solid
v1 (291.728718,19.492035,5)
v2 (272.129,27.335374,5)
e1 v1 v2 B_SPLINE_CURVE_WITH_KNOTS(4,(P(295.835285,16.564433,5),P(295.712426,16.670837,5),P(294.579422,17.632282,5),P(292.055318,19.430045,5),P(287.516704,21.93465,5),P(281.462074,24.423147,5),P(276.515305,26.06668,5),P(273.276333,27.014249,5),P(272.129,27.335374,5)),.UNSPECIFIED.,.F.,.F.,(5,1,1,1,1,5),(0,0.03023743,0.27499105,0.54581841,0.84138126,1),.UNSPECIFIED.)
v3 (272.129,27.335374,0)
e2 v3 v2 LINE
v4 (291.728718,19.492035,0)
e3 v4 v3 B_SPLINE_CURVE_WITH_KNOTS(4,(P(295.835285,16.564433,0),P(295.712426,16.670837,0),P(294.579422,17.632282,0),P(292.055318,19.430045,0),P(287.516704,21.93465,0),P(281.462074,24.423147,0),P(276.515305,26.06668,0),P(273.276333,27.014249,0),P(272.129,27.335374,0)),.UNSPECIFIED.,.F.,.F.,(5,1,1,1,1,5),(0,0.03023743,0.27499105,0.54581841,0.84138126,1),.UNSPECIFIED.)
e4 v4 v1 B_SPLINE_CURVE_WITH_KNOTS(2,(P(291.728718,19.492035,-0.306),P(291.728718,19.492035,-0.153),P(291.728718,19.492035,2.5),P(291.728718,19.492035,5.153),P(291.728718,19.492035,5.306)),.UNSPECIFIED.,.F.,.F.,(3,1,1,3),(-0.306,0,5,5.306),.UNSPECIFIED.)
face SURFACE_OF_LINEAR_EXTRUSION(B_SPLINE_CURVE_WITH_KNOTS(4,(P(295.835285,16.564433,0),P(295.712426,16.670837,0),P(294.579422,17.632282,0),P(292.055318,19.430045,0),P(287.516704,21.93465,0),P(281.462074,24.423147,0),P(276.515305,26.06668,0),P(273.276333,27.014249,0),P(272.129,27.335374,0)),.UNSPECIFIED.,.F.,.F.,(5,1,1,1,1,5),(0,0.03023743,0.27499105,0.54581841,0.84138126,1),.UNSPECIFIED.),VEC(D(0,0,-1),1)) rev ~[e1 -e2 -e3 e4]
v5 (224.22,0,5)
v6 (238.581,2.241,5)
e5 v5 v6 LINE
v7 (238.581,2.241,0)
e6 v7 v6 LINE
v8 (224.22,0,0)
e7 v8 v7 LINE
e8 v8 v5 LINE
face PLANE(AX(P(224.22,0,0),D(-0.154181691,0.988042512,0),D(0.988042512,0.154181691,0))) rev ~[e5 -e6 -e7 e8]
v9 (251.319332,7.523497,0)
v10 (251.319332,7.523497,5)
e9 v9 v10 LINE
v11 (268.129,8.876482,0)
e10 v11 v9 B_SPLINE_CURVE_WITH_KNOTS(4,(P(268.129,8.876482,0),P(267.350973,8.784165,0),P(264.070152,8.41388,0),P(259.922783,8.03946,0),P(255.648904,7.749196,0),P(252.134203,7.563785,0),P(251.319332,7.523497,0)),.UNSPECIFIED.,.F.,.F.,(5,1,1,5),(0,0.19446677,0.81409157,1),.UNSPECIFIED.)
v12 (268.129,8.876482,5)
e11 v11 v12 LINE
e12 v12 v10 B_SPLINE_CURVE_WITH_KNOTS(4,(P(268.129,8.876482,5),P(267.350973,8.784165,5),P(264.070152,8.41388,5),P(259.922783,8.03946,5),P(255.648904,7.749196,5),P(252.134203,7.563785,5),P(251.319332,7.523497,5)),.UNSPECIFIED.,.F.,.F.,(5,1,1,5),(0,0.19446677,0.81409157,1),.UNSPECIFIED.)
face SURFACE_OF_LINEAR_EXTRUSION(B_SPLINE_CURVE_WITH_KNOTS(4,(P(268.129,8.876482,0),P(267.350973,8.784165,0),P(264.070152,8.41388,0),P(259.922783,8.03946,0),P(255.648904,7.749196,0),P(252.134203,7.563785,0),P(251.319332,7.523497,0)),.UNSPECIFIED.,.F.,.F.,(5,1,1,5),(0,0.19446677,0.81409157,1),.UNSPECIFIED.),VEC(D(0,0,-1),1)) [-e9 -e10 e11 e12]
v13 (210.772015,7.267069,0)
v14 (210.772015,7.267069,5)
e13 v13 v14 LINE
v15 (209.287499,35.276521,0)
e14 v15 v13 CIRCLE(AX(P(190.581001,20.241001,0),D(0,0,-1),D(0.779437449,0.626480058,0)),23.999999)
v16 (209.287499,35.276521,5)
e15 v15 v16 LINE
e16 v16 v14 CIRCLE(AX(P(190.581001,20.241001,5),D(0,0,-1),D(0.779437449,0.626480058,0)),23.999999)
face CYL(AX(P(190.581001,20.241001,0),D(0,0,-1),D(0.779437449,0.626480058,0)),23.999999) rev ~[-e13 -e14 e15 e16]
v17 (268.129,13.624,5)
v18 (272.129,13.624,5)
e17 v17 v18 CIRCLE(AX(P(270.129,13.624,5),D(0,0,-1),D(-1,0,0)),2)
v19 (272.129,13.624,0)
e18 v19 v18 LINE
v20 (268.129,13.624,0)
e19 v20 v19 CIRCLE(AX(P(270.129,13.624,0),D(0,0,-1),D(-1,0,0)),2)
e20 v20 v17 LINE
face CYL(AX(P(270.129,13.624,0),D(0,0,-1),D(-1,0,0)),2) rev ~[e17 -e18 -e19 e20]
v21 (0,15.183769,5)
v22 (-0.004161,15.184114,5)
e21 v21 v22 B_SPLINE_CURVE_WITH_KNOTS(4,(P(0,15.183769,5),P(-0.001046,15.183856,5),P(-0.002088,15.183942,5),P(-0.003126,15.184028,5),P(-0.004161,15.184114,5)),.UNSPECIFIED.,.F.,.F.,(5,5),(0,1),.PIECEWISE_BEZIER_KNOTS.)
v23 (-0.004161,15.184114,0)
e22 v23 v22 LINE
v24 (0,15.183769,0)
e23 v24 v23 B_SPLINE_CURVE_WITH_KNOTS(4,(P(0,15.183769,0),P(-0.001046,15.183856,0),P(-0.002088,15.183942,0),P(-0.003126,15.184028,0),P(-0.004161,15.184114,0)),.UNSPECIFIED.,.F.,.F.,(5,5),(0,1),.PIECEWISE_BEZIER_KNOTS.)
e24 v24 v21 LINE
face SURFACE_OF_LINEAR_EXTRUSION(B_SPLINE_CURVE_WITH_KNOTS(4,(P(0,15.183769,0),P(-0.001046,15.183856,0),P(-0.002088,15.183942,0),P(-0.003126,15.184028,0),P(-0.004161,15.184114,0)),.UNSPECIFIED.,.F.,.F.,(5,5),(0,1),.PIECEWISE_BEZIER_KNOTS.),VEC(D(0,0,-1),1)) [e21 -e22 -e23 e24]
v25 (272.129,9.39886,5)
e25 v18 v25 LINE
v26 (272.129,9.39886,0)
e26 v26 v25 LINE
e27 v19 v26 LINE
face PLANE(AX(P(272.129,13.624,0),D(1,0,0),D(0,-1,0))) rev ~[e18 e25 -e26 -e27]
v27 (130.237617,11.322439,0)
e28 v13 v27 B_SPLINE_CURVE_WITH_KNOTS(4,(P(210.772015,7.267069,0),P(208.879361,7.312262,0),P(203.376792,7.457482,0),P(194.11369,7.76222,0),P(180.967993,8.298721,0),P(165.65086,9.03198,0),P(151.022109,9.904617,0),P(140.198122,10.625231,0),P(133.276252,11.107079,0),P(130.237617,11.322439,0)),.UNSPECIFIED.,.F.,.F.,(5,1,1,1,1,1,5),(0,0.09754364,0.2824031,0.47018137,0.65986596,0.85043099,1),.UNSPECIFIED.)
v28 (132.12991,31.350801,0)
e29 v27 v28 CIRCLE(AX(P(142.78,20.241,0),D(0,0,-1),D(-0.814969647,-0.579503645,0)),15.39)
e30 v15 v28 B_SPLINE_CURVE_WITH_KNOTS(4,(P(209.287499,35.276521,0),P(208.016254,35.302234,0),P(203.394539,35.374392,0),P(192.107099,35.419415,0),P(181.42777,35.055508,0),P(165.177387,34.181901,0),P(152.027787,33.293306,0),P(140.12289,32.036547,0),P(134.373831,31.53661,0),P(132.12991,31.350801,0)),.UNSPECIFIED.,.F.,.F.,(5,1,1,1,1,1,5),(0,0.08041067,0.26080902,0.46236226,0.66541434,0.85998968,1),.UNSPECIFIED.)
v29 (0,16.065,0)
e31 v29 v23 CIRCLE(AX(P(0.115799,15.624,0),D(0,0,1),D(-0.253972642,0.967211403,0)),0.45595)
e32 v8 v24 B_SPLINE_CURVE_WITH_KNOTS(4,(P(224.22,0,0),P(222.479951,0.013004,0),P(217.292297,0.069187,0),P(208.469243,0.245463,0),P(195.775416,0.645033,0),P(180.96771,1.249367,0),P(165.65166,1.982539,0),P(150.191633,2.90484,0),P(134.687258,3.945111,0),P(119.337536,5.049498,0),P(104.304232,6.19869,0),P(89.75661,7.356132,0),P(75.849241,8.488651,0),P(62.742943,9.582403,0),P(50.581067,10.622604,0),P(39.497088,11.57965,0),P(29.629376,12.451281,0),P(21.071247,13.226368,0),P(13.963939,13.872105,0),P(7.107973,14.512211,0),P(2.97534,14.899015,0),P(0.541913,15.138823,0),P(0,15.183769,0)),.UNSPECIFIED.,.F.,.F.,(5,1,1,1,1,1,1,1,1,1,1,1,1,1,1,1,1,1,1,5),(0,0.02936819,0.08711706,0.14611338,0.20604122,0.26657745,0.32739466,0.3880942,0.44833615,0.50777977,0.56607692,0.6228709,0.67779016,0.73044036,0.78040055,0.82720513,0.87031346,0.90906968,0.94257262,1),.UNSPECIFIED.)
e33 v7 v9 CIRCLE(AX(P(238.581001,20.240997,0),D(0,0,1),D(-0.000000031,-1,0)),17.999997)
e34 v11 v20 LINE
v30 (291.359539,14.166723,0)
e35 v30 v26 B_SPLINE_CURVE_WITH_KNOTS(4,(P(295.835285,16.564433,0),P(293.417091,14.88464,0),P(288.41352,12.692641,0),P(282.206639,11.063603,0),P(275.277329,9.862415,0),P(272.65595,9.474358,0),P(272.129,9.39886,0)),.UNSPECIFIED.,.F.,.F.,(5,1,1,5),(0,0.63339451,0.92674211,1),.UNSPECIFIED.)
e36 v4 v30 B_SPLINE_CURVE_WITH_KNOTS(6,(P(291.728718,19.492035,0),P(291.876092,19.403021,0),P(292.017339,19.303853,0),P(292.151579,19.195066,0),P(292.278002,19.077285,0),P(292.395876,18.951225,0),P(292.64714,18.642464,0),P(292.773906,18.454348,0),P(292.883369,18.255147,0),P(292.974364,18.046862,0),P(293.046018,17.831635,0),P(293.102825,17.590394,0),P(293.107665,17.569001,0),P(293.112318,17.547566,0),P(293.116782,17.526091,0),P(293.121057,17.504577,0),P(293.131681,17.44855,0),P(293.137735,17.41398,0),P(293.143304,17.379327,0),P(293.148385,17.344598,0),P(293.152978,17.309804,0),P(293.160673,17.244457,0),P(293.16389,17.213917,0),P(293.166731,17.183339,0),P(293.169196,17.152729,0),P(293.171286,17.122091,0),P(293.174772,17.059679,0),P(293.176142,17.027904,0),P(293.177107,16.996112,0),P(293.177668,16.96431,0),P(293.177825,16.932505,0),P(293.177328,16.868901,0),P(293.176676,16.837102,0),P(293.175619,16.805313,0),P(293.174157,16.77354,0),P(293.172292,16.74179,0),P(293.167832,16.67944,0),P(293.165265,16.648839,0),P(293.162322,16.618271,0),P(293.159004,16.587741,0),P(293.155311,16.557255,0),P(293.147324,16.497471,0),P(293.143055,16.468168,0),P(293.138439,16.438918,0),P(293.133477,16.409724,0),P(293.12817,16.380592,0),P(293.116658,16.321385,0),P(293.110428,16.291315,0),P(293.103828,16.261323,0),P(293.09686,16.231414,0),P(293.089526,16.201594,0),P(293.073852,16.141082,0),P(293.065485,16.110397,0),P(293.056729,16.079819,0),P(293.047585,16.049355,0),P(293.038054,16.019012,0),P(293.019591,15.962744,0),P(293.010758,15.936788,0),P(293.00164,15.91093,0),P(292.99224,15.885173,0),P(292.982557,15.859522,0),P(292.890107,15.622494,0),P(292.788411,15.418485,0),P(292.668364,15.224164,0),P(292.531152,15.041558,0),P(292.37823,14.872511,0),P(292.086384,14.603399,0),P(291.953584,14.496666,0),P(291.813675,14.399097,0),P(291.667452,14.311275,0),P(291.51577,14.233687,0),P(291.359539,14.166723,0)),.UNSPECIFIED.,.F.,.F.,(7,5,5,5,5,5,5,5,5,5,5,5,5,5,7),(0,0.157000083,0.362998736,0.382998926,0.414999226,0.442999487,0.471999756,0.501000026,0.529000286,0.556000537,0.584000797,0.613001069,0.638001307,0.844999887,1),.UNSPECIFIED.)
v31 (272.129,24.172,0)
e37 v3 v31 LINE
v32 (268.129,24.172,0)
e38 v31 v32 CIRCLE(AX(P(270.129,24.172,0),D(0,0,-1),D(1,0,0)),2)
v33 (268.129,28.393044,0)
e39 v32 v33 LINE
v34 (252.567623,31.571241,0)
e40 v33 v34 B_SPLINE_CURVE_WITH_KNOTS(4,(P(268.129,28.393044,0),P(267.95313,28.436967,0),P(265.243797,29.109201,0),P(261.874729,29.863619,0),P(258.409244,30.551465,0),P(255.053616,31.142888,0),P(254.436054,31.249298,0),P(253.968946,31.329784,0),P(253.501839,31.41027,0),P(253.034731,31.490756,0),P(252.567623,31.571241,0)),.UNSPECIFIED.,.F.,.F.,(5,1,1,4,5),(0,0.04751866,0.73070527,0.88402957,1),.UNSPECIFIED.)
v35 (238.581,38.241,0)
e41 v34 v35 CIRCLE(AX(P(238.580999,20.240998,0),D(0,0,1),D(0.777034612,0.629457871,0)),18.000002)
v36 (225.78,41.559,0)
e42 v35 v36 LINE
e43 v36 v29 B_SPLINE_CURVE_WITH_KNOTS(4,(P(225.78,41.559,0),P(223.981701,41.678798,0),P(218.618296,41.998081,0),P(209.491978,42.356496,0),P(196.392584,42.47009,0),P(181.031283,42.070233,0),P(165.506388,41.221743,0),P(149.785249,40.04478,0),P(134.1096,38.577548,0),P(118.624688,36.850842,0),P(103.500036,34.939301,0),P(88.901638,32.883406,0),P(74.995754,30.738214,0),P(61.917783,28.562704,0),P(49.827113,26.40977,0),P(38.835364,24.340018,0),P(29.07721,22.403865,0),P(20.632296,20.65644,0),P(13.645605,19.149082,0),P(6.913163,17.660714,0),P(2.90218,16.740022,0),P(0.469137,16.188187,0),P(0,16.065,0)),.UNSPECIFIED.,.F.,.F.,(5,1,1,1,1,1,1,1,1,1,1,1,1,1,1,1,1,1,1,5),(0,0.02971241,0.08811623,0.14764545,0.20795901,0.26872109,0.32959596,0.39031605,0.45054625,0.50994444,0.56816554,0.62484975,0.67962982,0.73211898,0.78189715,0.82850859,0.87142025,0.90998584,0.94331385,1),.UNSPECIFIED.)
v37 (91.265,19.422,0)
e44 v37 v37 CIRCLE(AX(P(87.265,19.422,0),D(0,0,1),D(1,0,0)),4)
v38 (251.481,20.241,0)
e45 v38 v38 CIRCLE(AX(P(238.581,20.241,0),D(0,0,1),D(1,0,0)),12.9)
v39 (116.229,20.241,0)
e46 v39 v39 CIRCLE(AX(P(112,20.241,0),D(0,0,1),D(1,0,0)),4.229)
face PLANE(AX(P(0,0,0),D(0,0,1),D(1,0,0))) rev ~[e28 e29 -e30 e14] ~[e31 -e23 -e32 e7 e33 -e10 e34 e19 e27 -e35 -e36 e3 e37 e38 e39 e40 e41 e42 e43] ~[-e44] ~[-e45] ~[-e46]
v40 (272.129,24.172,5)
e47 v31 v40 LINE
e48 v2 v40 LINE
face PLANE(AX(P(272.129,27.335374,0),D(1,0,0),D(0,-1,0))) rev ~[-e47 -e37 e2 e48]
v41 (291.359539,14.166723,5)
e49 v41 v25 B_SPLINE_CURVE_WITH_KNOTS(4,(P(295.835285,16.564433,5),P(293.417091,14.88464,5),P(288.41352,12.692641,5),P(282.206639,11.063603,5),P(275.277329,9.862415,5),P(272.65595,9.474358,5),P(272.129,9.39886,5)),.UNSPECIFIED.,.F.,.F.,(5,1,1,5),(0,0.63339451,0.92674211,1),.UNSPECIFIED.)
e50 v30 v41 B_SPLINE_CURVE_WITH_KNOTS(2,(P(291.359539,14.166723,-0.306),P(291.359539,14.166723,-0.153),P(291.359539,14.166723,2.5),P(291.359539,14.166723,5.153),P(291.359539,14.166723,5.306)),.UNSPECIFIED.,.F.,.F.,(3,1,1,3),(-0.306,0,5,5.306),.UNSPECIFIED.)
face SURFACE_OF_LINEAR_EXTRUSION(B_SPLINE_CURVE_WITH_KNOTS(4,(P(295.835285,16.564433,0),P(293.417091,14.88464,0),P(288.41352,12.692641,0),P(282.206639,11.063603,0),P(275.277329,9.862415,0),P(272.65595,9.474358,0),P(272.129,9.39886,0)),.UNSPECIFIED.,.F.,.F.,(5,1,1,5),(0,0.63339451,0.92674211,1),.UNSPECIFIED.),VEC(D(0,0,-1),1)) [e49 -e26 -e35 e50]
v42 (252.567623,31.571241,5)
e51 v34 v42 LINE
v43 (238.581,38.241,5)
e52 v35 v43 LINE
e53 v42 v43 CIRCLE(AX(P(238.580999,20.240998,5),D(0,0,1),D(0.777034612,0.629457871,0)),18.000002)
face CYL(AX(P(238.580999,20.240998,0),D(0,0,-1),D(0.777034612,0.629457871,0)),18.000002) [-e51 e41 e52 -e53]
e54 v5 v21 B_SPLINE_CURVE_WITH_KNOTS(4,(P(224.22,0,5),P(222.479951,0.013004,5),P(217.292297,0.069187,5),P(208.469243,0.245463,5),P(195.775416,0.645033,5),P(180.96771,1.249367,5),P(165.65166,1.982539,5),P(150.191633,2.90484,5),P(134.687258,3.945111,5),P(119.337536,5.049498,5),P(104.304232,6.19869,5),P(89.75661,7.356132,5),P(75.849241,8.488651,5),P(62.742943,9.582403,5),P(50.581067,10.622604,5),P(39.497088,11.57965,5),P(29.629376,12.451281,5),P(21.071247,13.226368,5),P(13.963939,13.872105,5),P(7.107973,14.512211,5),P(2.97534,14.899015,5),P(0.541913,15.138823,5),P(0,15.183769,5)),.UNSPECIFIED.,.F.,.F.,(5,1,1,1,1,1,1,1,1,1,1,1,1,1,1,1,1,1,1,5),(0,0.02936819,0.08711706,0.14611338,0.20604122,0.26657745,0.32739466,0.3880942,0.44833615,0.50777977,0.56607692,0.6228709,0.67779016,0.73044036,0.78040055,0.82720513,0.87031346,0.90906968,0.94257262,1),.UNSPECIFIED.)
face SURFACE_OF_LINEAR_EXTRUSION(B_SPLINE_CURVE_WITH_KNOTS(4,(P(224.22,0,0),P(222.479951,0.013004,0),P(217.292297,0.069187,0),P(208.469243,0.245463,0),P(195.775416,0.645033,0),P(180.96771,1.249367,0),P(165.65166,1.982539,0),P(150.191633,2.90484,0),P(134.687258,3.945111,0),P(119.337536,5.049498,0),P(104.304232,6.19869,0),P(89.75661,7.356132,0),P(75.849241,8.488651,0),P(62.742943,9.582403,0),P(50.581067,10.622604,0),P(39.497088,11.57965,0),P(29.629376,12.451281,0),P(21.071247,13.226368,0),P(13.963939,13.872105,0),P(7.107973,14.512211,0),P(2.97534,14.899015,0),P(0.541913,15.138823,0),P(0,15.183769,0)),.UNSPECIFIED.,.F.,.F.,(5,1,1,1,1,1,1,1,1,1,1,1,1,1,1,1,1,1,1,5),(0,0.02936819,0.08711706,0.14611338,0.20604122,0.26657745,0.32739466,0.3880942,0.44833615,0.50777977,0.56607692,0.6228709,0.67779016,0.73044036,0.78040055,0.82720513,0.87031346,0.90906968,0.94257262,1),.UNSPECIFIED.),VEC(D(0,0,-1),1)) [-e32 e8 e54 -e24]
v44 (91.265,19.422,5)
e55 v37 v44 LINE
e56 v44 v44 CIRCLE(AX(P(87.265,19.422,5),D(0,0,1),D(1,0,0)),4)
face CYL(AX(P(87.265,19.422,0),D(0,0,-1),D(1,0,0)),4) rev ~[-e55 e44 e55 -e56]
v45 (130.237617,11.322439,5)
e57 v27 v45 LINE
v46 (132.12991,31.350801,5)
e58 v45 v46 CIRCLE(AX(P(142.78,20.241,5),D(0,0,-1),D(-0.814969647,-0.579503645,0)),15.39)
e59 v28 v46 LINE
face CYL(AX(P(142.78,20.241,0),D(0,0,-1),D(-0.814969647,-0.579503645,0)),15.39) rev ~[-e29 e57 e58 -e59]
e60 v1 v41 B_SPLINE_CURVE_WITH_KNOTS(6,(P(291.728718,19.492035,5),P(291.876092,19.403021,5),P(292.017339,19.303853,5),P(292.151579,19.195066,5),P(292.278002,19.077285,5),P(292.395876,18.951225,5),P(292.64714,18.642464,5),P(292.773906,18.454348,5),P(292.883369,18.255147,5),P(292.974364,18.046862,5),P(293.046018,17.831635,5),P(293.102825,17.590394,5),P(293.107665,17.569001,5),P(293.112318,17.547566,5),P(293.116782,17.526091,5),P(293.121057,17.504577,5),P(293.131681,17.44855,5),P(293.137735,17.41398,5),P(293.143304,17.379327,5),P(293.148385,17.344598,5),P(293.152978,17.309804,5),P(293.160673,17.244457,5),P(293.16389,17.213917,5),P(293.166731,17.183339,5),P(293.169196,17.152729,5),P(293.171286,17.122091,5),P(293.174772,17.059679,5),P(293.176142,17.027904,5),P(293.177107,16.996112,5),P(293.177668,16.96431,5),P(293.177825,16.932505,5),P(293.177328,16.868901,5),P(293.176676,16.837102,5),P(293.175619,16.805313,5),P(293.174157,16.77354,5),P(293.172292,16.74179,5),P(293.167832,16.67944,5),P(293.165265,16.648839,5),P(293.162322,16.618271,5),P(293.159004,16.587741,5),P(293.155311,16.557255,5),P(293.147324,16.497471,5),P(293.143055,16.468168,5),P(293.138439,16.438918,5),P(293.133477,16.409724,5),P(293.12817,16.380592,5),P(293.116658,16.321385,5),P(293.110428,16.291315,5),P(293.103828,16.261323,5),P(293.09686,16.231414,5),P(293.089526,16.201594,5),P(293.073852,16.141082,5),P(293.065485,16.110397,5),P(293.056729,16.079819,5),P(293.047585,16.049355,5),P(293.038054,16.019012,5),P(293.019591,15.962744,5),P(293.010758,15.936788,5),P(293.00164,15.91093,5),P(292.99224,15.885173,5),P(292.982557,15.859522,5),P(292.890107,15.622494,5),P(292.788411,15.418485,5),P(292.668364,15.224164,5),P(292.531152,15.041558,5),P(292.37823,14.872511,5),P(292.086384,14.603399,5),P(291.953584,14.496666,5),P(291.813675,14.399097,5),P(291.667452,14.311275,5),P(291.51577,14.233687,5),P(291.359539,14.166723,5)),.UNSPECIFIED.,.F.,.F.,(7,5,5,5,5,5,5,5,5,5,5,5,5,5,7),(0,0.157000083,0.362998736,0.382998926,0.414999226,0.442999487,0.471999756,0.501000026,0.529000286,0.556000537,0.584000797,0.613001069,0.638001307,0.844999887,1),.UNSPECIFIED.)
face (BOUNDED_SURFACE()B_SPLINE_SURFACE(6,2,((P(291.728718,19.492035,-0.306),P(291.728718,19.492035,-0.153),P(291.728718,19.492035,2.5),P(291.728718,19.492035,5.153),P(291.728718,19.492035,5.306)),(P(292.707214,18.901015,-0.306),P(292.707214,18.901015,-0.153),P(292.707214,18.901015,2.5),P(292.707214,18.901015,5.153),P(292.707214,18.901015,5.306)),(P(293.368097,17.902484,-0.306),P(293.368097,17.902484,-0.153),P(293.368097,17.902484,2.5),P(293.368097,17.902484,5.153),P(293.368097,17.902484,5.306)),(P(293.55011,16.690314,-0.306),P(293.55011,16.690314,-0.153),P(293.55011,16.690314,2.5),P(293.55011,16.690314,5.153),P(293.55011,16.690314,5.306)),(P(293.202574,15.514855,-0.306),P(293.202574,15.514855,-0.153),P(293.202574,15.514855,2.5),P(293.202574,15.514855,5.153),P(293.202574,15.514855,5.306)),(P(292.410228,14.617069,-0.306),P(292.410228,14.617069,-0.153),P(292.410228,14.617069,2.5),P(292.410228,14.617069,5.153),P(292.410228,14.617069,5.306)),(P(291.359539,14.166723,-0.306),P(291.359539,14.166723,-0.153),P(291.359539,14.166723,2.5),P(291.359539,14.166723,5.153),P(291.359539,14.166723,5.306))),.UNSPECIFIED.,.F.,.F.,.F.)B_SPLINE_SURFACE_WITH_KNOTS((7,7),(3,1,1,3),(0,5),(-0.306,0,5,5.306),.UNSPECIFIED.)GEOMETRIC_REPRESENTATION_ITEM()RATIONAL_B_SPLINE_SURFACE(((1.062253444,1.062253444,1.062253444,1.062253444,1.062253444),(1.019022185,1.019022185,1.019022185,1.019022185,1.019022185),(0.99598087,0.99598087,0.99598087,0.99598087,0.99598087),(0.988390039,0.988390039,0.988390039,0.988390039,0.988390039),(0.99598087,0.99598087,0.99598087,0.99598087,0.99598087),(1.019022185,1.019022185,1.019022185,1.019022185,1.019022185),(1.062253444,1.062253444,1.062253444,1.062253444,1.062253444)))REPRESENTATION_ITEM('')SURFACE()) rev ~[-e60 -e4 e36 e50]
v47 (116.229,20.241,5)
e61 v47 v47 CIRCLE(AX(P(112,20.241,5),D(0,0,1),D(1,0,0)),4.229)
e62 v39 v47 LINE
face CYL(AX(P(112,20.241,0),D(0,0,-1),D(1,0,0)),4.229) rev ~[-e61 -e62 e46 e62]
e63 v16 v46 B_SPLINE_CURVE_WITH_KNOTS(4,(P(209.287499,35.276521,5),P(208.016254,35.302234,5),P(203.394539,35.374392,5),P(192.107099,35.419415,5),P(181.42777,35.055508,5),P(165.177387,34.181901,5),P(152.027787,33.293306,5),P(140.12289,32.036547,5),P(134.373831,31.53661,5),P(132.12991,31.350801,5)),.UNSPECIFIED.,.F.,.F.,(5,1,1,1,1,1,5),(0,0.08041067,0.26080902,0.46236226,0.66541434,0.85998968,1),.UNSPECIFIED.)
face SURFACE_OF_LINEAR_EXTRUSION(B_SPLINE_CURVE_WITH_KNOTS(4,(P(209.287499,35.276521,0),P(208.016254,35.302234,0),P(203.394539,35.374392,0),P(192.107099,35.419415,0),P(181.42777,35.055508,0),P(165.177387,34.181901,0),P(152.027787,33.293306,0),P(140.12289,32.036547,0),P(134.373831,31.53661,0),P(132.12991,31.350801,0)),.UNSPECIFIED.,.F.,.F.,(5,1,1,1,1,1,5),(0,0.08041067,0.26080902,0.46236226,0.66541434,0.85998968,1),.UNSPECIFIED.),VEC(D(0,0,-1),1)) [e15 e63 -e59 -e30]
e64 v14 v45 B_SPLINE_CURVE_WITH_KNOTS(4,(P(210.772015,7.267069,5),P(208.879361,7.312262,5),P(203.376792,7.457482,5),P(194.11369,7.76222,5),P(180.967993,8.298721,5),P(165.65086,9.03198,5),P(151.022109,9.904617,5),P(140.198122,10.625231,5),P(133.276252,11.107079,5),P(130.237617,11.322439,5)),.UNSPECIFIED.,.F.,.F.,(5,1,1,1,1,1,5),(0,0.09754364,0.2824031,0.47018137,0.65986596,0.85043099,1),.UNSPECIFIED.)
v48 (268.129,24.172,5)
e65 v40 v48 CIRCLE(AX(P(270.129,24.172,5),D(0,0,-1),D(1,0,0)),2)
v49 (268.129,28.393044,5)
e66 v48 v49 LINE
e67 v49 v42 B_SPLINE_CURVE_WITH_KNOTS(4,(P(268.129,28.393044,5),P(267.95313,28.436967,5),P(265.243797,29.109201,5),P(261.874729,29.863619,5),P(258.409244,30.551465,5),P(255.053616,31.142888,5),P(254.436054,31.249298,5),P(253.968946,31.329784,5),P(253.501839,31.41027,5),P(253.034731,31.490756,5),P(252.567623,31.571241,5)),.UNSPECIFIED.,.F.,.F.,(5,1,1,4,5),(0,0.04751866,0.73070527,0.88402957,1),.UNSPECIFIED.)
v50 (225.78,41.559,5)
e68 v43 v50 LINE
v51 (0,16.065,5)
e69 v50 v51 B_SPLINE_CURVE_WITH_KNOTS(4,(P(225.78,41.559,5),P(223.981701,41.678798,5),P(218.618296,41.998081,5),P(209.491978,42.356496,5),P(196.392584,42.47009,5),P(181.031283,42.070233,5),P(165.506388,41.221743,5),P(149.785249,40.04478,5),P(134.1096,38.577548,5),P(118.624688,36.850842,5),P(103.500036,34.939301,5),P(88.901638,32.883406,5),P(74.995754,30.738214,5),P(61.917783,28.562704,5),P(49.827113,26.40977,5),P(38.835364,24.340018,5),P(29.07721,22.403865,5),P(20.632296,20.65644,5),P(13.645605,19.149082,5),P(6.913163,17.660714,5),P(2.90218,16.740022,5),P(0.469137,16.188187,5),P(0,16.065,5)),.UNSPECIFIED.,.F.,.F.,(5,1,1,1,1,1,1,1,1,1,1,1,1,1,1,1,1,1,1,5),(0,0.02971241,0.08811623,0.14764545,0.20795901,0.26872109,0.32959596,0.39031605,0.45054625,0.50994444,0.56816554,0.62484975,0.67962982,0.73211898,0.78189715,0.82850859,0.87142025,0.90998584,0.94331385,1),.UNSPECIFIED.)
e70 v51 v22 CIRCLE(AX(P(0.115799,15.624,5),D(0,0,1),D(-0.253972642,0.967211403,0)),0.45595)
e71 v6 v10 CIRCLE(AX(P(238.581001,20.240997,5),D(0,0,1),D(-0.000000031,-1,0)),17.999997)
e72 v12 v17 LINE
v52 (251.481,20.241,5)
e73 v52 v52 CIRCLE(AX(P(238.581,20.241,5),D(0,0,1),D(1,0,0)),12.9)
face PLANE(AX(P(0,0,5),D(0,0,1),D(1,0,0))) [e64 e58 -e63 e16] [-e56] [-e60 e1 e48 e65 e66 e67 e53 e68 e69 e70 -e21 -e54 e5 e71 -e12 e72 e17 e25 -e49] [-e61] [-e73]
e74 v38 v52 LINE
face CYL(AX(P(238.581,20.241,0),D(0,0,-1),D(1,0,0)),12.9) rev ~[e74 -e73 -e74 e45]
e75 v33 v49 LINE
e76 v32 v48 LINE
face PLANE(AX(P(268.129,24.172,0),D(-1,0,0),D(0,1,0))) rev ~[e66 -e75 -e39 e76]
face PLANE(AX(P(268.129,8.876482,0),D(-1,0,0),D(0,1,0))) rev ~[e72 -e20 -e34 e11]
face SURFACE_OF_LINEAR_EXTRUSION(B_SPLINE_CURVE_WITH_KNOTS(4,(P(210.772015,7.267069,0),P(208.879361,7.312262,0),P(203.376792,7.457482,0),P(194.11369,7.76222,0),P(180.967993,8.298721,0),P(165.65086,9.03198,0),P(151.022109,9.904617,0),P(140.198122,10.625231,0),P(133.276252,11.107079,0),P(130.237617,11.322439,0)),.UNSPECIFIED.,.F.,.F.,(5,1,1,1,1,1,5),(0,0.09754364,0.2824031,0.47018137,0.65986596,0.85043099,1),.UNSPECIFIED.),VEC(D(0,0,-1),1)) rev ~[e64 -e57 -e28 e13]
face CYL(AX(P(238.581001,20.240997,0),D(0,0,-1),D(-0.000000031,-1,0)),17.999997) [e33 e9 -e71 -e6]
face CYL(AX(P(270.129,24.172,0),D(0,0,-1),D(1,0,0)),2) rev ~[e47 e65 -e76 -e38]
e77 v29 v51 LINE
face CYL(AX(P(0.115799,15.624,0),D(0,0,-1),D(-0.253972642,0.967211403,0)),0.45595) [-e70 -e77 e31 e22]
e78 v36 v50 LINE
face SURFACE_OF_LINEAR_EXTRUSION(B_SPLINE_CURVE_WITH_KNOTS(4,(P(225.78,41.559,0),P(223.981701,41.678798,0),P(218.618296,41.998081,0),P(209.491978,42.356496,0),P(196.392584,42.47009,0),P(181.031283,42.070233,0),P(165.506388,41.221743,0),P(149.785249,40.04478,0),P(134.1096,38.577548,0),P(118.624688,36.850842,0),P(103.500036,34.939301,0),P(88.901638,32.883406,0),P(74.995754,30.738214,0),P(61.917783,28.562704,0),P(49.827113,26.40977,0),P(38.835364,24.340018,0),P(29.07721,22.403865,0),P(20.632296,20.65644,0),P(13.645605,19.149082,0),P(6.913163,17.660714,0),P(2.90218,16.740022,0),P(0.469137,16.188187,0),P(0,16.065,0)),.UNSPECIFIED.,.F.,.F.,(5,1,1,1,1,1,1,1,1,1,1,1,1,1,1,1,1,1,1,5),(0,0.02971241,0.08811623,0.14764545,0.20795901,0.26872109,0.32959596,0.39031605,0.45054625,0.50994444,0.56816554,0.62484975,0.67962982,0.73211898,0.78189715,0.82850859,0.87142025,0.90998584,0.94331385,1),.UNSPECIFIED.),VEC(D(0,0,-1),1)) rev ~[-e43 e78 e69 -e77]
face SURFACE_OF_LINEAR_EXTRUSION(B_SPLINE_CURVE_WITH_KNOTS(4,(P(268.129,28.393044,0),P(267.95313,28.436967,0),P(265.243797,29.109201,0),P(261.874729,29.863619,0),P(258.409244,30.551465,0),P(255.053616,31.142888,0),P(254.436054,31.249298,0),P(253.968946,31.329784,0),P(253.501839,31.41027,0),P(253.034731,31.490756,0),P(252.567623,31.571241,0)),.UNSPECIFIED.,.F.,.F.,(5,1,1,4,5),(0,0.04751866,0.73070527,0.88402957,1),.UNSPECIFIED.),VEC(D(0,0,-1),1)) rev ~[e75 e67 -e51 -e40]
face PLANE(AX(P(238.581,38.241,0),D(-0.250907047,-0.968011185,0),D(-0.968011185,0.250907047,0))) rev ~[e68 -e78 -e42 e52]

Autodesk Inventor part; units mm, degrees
ref_plane "YZ Plane" through (0, 0, 0) normal (1, 0, 0) x (0, 1, 0)
ref_plane "XZ Plane" through (0, 0, 0) normal (0, 1, 0) x (-1, 0, 0)
ref_plane "XY Plane" through (0, 0, 0) normal (0, 0, 1) x (1, 0, 0)
sketch "Sketch1" plane through (0, 0, 0) normal (0, 0, 1) x (1, 0, 0)
  spline S0 degree 4 poles (254.436054, 38.258138) (252.159915, 38.650332) (246.788709, 39.499265) (237.984874, 40.618279) (225.357478, 41.704285) (211.202741, 42.341661) (196.392584, 42.47009) (181.031283, 42.070233) (165.506388, 41.221743) (149.785249, 40.04478) (134.1096, 38.577548) (118.624688, 36.850842) (103.500036, 34.939301) (88.901638, 32.883406) (74.995754, 30.738214) (61.917783, 28.562704) (49.827113, 26.40977) (38.835364, 24.340018) (29.07721, 22.403865) (20.632296, 20.65644) (13.645605, 19.149082) (6.913163, 17.660714) (2.90218, 16.740022) (0.469137, 16.188187) (0, 16.065) knots 0.21429705 0.21429705 0.21429705 0.21429705 0.21429705 0.2433201 0.28177524 0.32154178 0.36237973 0.40400459 0.44617789 0.48866482 0.5312306 0.57368816 0.61580317 0.65733642 0.6980466 0.73768213 0.77598623 0.81268845 0.84749504 0.88008735 0.91009265 0.93705903 0.9603631 1 1 1 1 1
  spline S1 degree 4 poles (299.999998, 15.624) (299.805651, 13.312974) (297.70854, 10.343184) (293.050897, 7.5008) (285.395888, 4.883043) (278.112378, 3.216454) (269.51472, 1.892454) (259.681019, 0.912997) (248.712883, 0.278332) (236.711867, -0.030891) (223.806667, -0.050368) (210.125319, 0.193333) (195.775416, 0.645033) (180.96771, 1.249367) (165.65166, 1.982539) (150.191633, 2.90484) (134.687258, 3.945111) (119.337536, 5.049498) (104.304232, 6.19869) (89.75661, 7.356132) (75.849241, 8.488651) (62.742943, 9.582403) (50.581067, 10.622604) (39.497088, 11.57965) (29.629376, 12.451281) (21.071247, 13.226368) (13.963939, 13.872105) (7.103576, 14.512622) (2.968279, 14.899676) (0.533018, 15.1397) (-0.004161, 15.184114) knots 0 0 0 0 0 0.05437224 0.07982113 0.10791215 0.1384988 0.1713415 0.2061871 0.24278378 0.28089063 0.3202767 0.36071301 0.4020228 0.44398485 0.4863729 0.52895769 0.5714601 0.61364209 0.65526508 0.6960853 0.73585299 0.77430798 0.81117416 0.84615676 0.87892978 0.90911464 0.93625212 0.9597112 1 1 1 1 1
  arc A0 (0, 16.065) -> (-0.004161, 15.184114) centre (0.115799, 15.624) ccw
  line L0 (0.115799, 15.624) -> (227.990221, 15.624) construction
  line L1 (299.999998, 15.624) -> (0.115799, 15.624) construction
  line L2 (299.999998, 15.624) -> (199.999998, 15.624) construction
  line L3 (199.999998, 15.624) -> (199.999998, 42.37734) construction
  line L4 (199.999998, 15.624) -> (199.999998, 0.52729)
  line L5 (0, 0) -> (0, 20.241)
  line L6 (0, 20.241) -> (238.581, 20.241) construction
  circle A1 centre (238.581, 20.241) radius 14
  line L7 (238.581, 20.241) -> (208.581, 20.241)
  line L8 (238.581, 25.359) -> (238.581, 20.241)
  line L9 (0, 20.241) -> (112, 20.241) construction
  circle A2 centre (112, 20.241) radius 5.39
  line L10 (0, 15.624) -> (112, 15.624) construction
  line L11 (0, 15.624) -> (112, 15.624) construction
  line L12 (112, 15.624) -> (112, 35.994456)
  line L13 (112, 15.624) -> (112, 5.61525)
  spline S2 degree 4 poles (299.285198, 20.241) (299.227939, 20.131643) (299.16804, 20.023225) (299.105573, 19.915754) (299.040612, 19.809235) knots 0 0 0 0 0 1 1 1 1 1
  line L14 (299.207055, 20.082158) -> (298.87417, 19.536312) construction
  arc A3 (298.903999, 19.593162) -> (299.170168, 20.029611) centre (292.291091, 23.925437) ccw construction
  line L15 (299.43203, 20.521431) -> (299.138367, 19.960569) construction
  arc A4 (299.163926, 20.01882) -> (299.398715, 20.467241) centre (292.801001, 23.636075) ccw construction
  spline S3 degree 2 poles (295.850621, 16.559978) (295.157262, 16.069203) (294.393311, 15.624) knots 0 0 0 1 1 1
  line L16 (294.550692, 15.715716) -> (294.235931, 15.532284) construction
  arc A5 (294.267154, 15.551069) -> (294.518956, 15.69781) centre (283.884356, 33.65696) ccw construction
  spline S4 degree 4 poles (296.856901, 15.624) (296.618326, 15.862944) (296.370731, 16.098547) (296.114674, 16.330852) (295.850621, 16.559978) knots 0 0 0 0 0 1 1 1 1 1
  spline S5 degree 4 poles (219.58717, 34.91187) (218.695351, 34.95198) (214.858509, 35.106335) (210.707211, 35.329502) (192.898023, 35.446366) (181.42777, 35.055508) (165.177387, 34.181901) (149.561876, 33.12667) (133.828431, 31.347909) (128.265438, 31.097419) (123.390775, 30.590026) knots 0 0 0 0 0 0.13924435 0.23321956 0.36393672 0.50998276 0.65711487 0.7981047 1 1 1 1 1
  line L17 (295.959293, 16.465681) -> (295.74195, 16.654276) construction
  arc A6 (295.937354, 16.484307) -> (295.763482, 16.635181) centre (281.87292, 0.451609) ccw construction
  line L18 (232.743774, 34.364452) -> (201.193566, 35.681454) construction
  arc A7 (229.586762, 34.454933) -> (204.347135, 35.508511) centre (136.348344, -1896.324468) ccw construction
  arc A8 (264.266057, 15.123) -> (264.360826, 15.624) centre (238.581, 20.241) ccw
  circle A9 centre (238.581, 20.241) radius 24
  circle A10 centre (112, 20.241) radius 15.39
  spline S6 degree 4 poles (299.999998, 15.624) (300.269142, 17.933652) (298.783415, 21.267693) (294.693448, 24.979847) (287.53174, 28.940551) (280.486947, 31.820538) (271.480983, 34.718213) (262.486804, 36.793013) (257.700386, 37.695672) (254.436054, 38.258138) knots 0 0 0 0 0 0.24755477 0.36385739 0.4925498 0.63299607 0.77826439 1 1 1 1 1
  line L19 (285.294543, 32.941011) -> (223.577565, 43.575266) construction
  arc A11 (278.722442, 32.634865) -> (229.668212, 41.087243) centre (217.218351, -177.738587) ccw construction
  line L20 (285.294543, 32.941011) -> (223.577565, 43.575266) construction
  arc A12 (278.877125, 33.041766) -> (229.658629, 41.522447) centre (200.894914, -272.473312) ccw construction
  spline S7 degree 4 poles (251.493, 31.73616) (243.700929, 32.967588) (232.160237, 34.296592) (216.442824, 35.287928) (196.392341, 35.461091) (181.031705, 35.061513) (165.505292, 34.212684) (149.788285, 33.036509) (134.101234, 31.567156) (118.647366, 29.846206) (103.439709, 27.919279) (89.058912, 25.903716) (74.837064, 23.692714) (62.488433, 21.669546) (49.639937, 19.354465) (46.379459, 18.742869) (43.812536, 18.259032) knots 0 0 0 0 0 0.1639631 0.23233838 0.3020312 0.37264227 0.44377843 0.51504665 0.58613365 0.65664712 0.72618654 0.7943479 0.86070997 0.92034602 1 1 1 1 1 construction
  spline S8 degree 4 poles (295.845009, 16.556007) (295.719822, 16.664559) (294.584958, 17.628339) (292.058546, 19.428263) (287.516704, 21.93465) (280.467029, 24.832118) (271.97142, 27.522599) (264.208658, 29.400369) (258.409244, 30.551465) (255.053616, 31.142888) (254.436054, 31.249298) (253.968946, 31.329784) (253.501839, 31.41027) (253.034731, 31.490756) (252.567623, 31.571241) knots 0 0 0 0 0 0.01890503 0.16895946 0.33499927 0.51620401 0.71116085 0.9183366 0.96483207 0.96483207 0.96483207 0.96483207 1 1 1 1 1
  line L21 (285.294543, 25.932171) -> (223.577565, 36.566425) construction
  line L22 (285.294543, 25.932171) -> (223.577565, 36.566425) construction
  arc A13 (278.722442, 25.626025) -> (229.668212, 34.078402) centre (217.218351, -184.747428) ccw construction
  line L23 (270.129, 9.125374) -> (275.129, 9.125374) construction
  line L24 (281.07, 24.45816) -> (286.07, 24.45816) construction
  line L25 (318.821413, -3.367269) -> (272.868604, 36.479282) construction
  arc A14 (303.207925, 0.551953) -> (278.959518, 21.578206) centre (281.857648, 0.425162) ccw construction
  spline S9 degree 4 poles (295.835285, 16.564433) (293.417091, 14.88464) (288.41352, 12.692641) (280.70627, 10.669821) (269.511023, 8.939829) (259.682627, 7.96324) (248.712204, 7.32734) (236.712148, 7.018633) (223.806545, 6.998947) (210.125394, 7.242728) (195.775305, 7.694406) (180.967993, 8.298721) (165.65086, 9.03198) (150.193891, 9.954022) (134.681006, 10.995018) (119.354518, 12.097424) (104.258979, 13.251926) (89.874814, 14.39542) (75.752353, 15.547068) (62.906491, 16.616479) (50.510696, 17.677636) (46.516568, 18.024605) (43.812536, 18.259032) knots 0 0 0 0 0 0.08476672 0.12402522 0.16617938 0.21090431 0.25787677 0.30678758 0.35734028 0.40924097 0.46226281 0.51612182 0.5705276 0.62518592 0.67973848 0.7338798 0.78730362 0.83969707 0.89073959 0.93714265 1 1 1 1 1
  spline S10 degree 4 poles (21.462276, 20.241) (20.622656, 20.316984) (20.124028, 20.362207) (19.919133, 20.380856) (19.554048, 20.414029) knots 0 0 0 0 0 1 1 1 1 1 construction
  line L26 (68.488377, 16.119755) -> (19.136695, 20.398308) construction
  arc A15 (63.551474, 16.528056) -> (24.070206, 19.950891) centre (-819.899413, -9944.371227) ccw construction
  line L27 (21.724437, 20.217275) -> (21.200116, 20.264725) construction
  arc A16 (21.252548, 20.259982) -> (21.672005, 20.222022) centre (898.635849, 9712.955601) ccw construction
  line L28 (74.254065, 23.996937) -> (13.371006, 12.521126) construction
  arc A17 (68.175943, 22.793945) -> (19.469999, 13.613391) centre (1053.390082, -5337.891027) ccw construction
  spline S11 degree 4 poles (218.437499, 7.193419) (217.617295, 7.240848) (213.819214, 7.468804) (209.586315, 6.850678) (192.548492, 7.944114) (181.146901, 8.16297) (165.746092, 9.02826) (149.142366, 9.880106) (139.977668, 10.751942) (129.107316, 11.246393) (124.68665, 11.528881) knots 0 0 0 0 0 0.12763083 0.21372336 0.33362841 0.4674456 0.60262129 0.73842442 0.88039529 0.88039529 0.88039529 0.88039529 0.88039529
  line L29 (133.533683, 10.96354) -> (115.839617, 12.094223) construction
  arc A18 (117.617989, 12.078874) -> (131.767822, 11.174674) centre (141.026952, 267.238396) ccw construction
  line L30 (140.664975, 32.388062) -> (106.116576, 28.79199) construction
  arc A19 (137.221962, 31.449676) -> (109.679039, 28.58279) centre (140.622493, -134.959578) ccw construction
  circle A20 centre (238.581, 20.241) radius 18
  line L31 (238.581, 38.241) -> (225.78, 41.559)
  line L32 (238.581, 2.241) -> (224.22, 0)
  line L33 (214.581, 20.241) -> (214.581, 42.126574) construction
  line L34 (127.39, 20.241) -> (127.39, 11.525517) construction
  line L35 (127.39, 20.241) -> (131.31394, 20.241) construction
  line L36 (96.61, 20.241) -> (96.61, 13.863077) construction
  line L37 (270.129, 5.61525) -> (270.129, 15.624) construction
  line L38 (272.129, 7.61525) -> (272.129, 13.624)
  line L39 (268.129, 13.624) -> (268.129, 7.61525)
  arc A21 (268.129, 7.61525) -> (272.129, 7.61525) centre (270.129, 7.61525) ccw
  arc A22 (272.129, 13.624) -> (268.129, 13.624) centre (270.129, 13.624) ccw
  line L40 (270.129, 32.18075) -> (270.129, 22.172) construction
  line L41 (272.129, 30.18075) -> (272.129, 24.172)
  line L42 (268.129, 24.172) -> (268.129, 30.18075)
  arc A23 (272.129, 30.18075) -> (268.129, 30.18075) centre (270.129, 30.18075) ccw
  arc A24 (268.129, 24.172) -> (272.129, 24.172) centre (270.129, 24.172) ccw
  arc A25 (199.999998, 42.31547) -> (199.853854, 42.377258) centre (190.581, 20.241) ccw
  arc A26 (171.272979, 34.495835) -> (171.268099, 34.489223) centre (190.581, 20.241) ccw
  arc A27 (210.748391, 7.230376) -> (209.287499, 35.276521) centre (190.581, 20.241) ccw
  arc A28 (169.44554, 8.870309) -> (169.474435, 8.816763) centre (190.581, 20.241) ccw
  arc A29 (153.976817, 9.682431) -> (154.030254, 9.739387) centre (142.78, 20.241) ccw
  arc A30 (151.241916, 33.095886) -> (151.219343, 33.110716) centre (142.78, 20.241) ccw
  arc A31 (132.12991, 31.350801) -> (130.322928, 11.203663) centre (142.78, 20.241) ccw
  arc A32 (95.274104, 13.969298) -> (95.169771, 26.74146) centre (81.22, 20.241) ccw
  arc A33 (66.333989, 16.334751) -> (66.538876, 15.624) centre (81.22, 20.241) ccw
  line L43 (112, 20.241) -> (112, 14.851) construction
  line L44 (112, 14.851) -> (87.265, 19.422) construction
  circle A34 centre (87.265, 19.422) radius 4
  circle A35 centre (238.581, 20.241) radius 12.9
  circle A36 centre (112, 20.241) radius 4.229
  point P0 (0.783, 16.254)
  point P1 (3.213, 16.812)
  point P2 (7.239, 17.724)
  point P3 (12.813, 18.96)
  point P4 (19.884, 20.484)
  point P5 (28.374, 22.245)
  point P6 (38.199, 24.195)
  point P7 (49.254, 26.28)
  point P8 (61.419, 28.446)
  point P9 (74.571, 30.636)
  point P10 (88.56, 32.793)
  point P11 (103.242, 34.86)
  point P12 (118.455, 36.783)
  point P13 (134.028, 38.511)
  point P14 (149.793, 39.984)
  point P15 (165.576, 41.16)
  point P16 (181.206, 41.985)
  point P17 (196.638, 42.363)
  point P18 (211.554, 42.222)
  point P19 (239.145, 40.389)
  point P20 (262.68, 36.666)
  point P21 (272.577, 34.218)
  point P22 (281.07, 31.467)
  point P23 (288.069, 28.491)
  point P24 (293.505, 25.359)
  point P25 (297.324, 22.137)
  point P26 (300, 15.624)
  point P27 (0.861, 15.105)
  point P28 (3.342, 14.868)
  point P29 (7.446, 14.481)
  point P30 (13.122, 13.953)
  point P31 (20.31, 13.296)
  point P32 (28.92, 12.519)
  point P33 (38.856, 11.64)
  point P34 (50.007, 10.674)
  point P35 (62.244, 9.63)
  point P36 (75.429, 8.529)
  point P37 (89.418, 7.389)
  point P38 (104.052, 6.228)
  point P39 (119.172, 5.076)
  point P40 (134.613, 3.966)
  point P41 (150.207, 2.928)
  point P42 (165.783, 2.013)
  point P43 (181.167, 1.263)
  point P44 (196.068, 0.663)
  point P45 (210.468, 0.225)
  point P46 (237.189, 0.039)
  point P47 (249.246, 0.378)
  point P48 (260.262, 1.05)
  point P49 (270.129, 2.076)
  point P50 (278.739, 3.462)
  point P51 (285.993, 5.211)
  point P52 (291.81, 7.314)
  point P53 (296.121, 9.756)
  point P54 (298.863, 12.531)
  point P55 (199.999998, 15.624)
  point P56 (225.364219, 15.624)
  point P57 (238.581, 6.241)
  point P58 (238.581, 34.241)
  point P59 (225.364219, 15.624)
  point P60 (251.797781, 15.624)
  point P61 (0, 16.065)
  point P62 (0, 15.183769)
  point P63 (224.581, 20.241)
  point P64 (112, 25.631)
  point P65 (0, 9.065)
  point P66 (0.783, 9.254)
  point P67 (3.213, 9.812)
  point P68 (7.239, 10.724)
  point P69 (12.813, 11.96)
  point P70 (19.884, 13.484)
  point P71 (28.374, 15.245)
  point P72 (38.199, 17.195)
  point P73 (49.254, 19.28)
  point P74 (61.419, 21.446)
  point P75 (74.571, 23.636)
  point P76 (88.56, 25.793)
  point P77 (103.242, 27.86)
  point P78 (118.455, 29.783)
  point P79 (134.028, 31.511)
  point P80 (149.793, 32.984)
  point P81 (165.576, 34.16)
  point P82 (181.206, 34.985)
  point P83 (225.78, 34.559)
  point P84 (239.145, 33.389)
  point P85 (251.493, 31.745)
  point P86 (262.68, 29.666)
  point P87 (272.577, 27.218)
  point P88 (281.07, 24.467)
  point P89 (288.069, 21.491)
  point P90 (293.505, 18.359)
  point P91 (297.324, 15.137)
  point P92 (299.493, 11.879)
  point P93 (300, 8.624)
  point P94 (-0.004161, 22.184114)
  point P95 (0.861, 22.105)
  point P96 (3.342, 21.868)
  point P97 (7.446, 21.481)
  point P98 (13.122, 20.953)
  point P99 (20.31, 20.296)
  point P100 (28.92, 19.519)
  point P101 (38.856, 18.64)
  point P102 (50.007, 17.674)
  point P103 (62.244, 16.63)
  point P104 (75.429, 15.529)
  point P105 (89.418, 14.389)
  point P106 (104.052, 13.228)
  point P107 (119.172, 12.076)
  point P108 (134.613, 10.966)
  point P109 (150.207, 9.928)
  point P110 (165.783, 9.013)
  point P111 (181.167, 8.263)
  point P112 (196.068, 7.663)
  point P113 (210.468, 7.225)
  point P114 (224.22, 7)
  point P115 (237.189, 7.039)
  point P116 (249.246, 7.378)
  point P117 (260.262, 8.05)
  point P118 (270.129, 9.076)
  point P119 (278.739, 10.462)
  point P120 (285.993, 12.211)
  point P121 (291.81, 14.314)
  point P122 (296.121, 16.756)
  point P123 (298.863, 19.531)
  point P124 (300, 22.624)
  point P125 (18.740477, 20.241)
  point P126 (216.96867, 35.022953)
  point P127 (0, 16.065)
  point P128 (296.856901, 15.624)
  point P129 (294.393311, 15.624)
  point P130 (219.58717, 34.91187)
  point P131 (123.390775, 30.590026)
  point P132 (254.436054, 38.258138)
  point P133 (0, 9.05616)
  point P134 (0.783, 9.24516)
  point P135 (3.213, 9.80316)
  point P136 (7.239, 10.71516)
  point P137 (12.813, 11.95116)
  point P138 (19.884, 13.47516)
  point P139 (28.374, 15.23616)
  point P140 (38.199, 17.18616)
  point P141 (49.254, 19.27116)
  point P142 (61.419, 21.43716)
  point P143 (74.571, 23.62716)
  point P144 (88.56, 25.78416)
  point P145 (103.242, 27.85116)
  point P146 (118.455, 29.77416)
  point P147 (134.028, 31.50216)
  point P148 (149.793, 32.97516)
  point P149 (165.576, 34.15116)
  point P150 (181.206, 34.97616)
  point P151 (196.638, 35.35416)
  point P152 (211.554, 35.21316)
  point P153 (225.78, 34.55016)
  point P154 (262.68, 29.65716)
  point P155 (272.577, 27.20916)
  point P156 (297.324, 15.12816)
  point P157 (299.493, 11.87016)
  point P158 (300, 8.61516)
  point P159 (254.436054, 31.249298)
  point P160 (216.884838, -206.362485)
  point P161 (278.876889, 26.073396)
  point P162 (229.590604, 33.866167)
  point P163 (-0.004161, 22.233488)
  point P164 (0.861, 22.154374)
  point P165 (3.342, 21.917374)
  point P166 (7.446, 21.530374)
  point P167 (13.122, 21.002374)
  point P168 (28.92, 19.568374)
  point P169 (38.856, 18.689374)
  point P170 (50.007, 17.723374)
  point P171 (62.244, 16.679374)
  point P172 (75.429, 15.578374)
  point P173 (89.418, 14.438374)
  point P174 (104.052, 13.277374)
  point P175 (119.172, 12.125374)
  point P176 (134.613, 11.015374)
  point P177 (150.207, 9.977374)
  point P178 (165.783, 9.062374)
  point P179 (181.167, 8.312374)
  point P180 (196.068, 7.712374)
  point P181 (210.468, 7.274374)
  point P182 (224.22, 7.049374)
  point P183 (237.189, 7.088374)
  point P184 (249.246, 7.427374)
  point P185 (260.262, 8.099374)
  point P186 (278.739, 10.511374)
  point P187 (285.993, 12.260374)
  point P188 (296.121, 16.805374)
  point P189 (298.863, 19.580374)
  point P190 (300, 22.673374)
  point P191 (225.700031, -0.009448)
  point P192 (252.261653, 0.521981)
  point P193 (227.349521, 41.450759)
  point P194 (105.977751, 6.07821)
  point P195 (115.800844, 5.327728)
  point P196 (98.259993, 27.173842)
  point P197 (260.452219, 30.122789)
  point P198 (123.585295, 30.371797)
  point P199 (134.59788, 31.560388)
  dimension "d38" = 10.78
  dimension "d17" = 100
  dimension "d19" = 20.241
  dimension "d20" = 238.581
  dimension "d21" = 28
  dimension "d37" = 112
  dimension "d39" = 112
  dimension "d40" = 0
  dimension "d43" = 10
  dimension "d44" = 10
  dimension "d55" = 4
  dimension "d56" = 90
  dimension "d58" = 4
  dimension "d60" = 8
  dimension "d62" = 0.819
  dimension "d63" = 24.735
  dimension "d65" = 25.8
  dimension "d66" = 8.458
sketch "Sketch1 outline for Extrusion3" plane through (0, 0, 0) normal (0, 0, 1) x (1, 0, 0)
  spline S0 degree 4 poles (0, 15.183769) (-0.001046, 15.183856) (-0.002088, 15.183942) (-0.003126, 15.184028) (-0.004161, 15.184114) knots 0 0 0 0 0 1 1 1 1 1
  spline S1 degree 4 poles (224.22, 0) (222.479951, 0.013004) (217.292297, 0.069187) (208.469243, 0.245463) (195.775416, 0.645033) (180.96771, 1.249367) (165.65166, 1.982539) (150.191633, 2.90484) (134.687258, 3.945111) (119.337536, 5.049498) (104.304232, 6.19869) (89.75661, 7.356132) (75.849241, 8.488651) (62.742943, 9.582403) (50.581067, 10.622604) (39.497088, 11.57965) (29.629376, 12.451281) (21.071247, 13.226368) (13.963939, 13.872105) (7.107973, 14.512211) (2.97534, 14.899015) (0.541913, 15.138823) (0, 15.183769) knots 0 0 0 0 0 0.02936819 0.08711706 0.14611338 0.20604122 0.26657745 0.32739466 0.3880942 0.44833615 0.50777977 0.56607692 0.6228709 0.67779016 0.73044036 0.78040055 0.82720513 0.87031346 0.90906968 0.94257262 1 1 1 1 1
  line L0 (224.22, 0) -> (238.581, 2.241)
  arc A0 (238.581, 2.241) -> (251.319332, 7.523497) centre (238.581, 20.241) ccw
  spline S2 degree 4 poles (268.129, 8.876482) (267.350973, 8.784165) (264.070152, 8.41388) (259.922783, 8.03946) (255.648904, 7.749196) (252.134203, 7.563785) (251.319332, 7.523497) knots 0 0 0 0 0 0.19446677 0.81409157 1 1 1 1 1
  line L1 (268.129, 8.876482) -> (268.129, 13.624)
  arc A1 (268.129, 13.624) -> (272.129, 13.624) centre (270.129, 13.624) cw
  line L2 (272.129, 13.624) -> (272.129, 9.39886)
  spline S3 degree 4 poles (295.835285, 16.564433) (293.417091, 14.88464) (288.41352, 12.692641) (282.206639, 11.063603) (275.277329, 9.862415) (272.65595, 9.474358) (272.129, 9.39886) knots 0 0 0 0 0 0.63339451 0.92674211 1 1 1 1 1
  spline S4 degree 4 poles (295.835285, 16.564433) (295.712426, 16.670837) (294.579422, 17.632282) (292.055318, 19.430045) (287.516704, 21.93465) (281.462074, 24.423147) (276.515305, 26.06668) (273.276333, 27.014249) (272.129, 27.335374) knots 0 0 0 0 0 0.03023743 0.27499105 0.54581841 0.84138126 1 1 1 1 1
  line L3 (272.129, 27.335374) -> (272.129, 24.172)
  arc A2 (272.129, 24.172) -> (268.129, 24.172) centre (270.129, 24.172) cw
  line L4 (268.129, 24.172) -> (268.129, 28.393044)
  spline S5 degree 4 poles (268.129, 28.393044) (267.95313, 28.436967) (265.243797, 29.109201) (261.874729, 29.863619) (258.409244, 30.551465) (255.053616, 31.142888) (254.436054, 31.249298) (253.968946, 31.329784) (253.501839, 31.41027) (253.034731, 31.490756) (252.567623, 31.571241) knots 0 0 0 0 0 0.04751866 0.73070527 0.88402957 0.88402957 0.88402957 0.88402957 1 1 1 1 1
  arc A3 (252.567623, 31.571241) -> (238.581, 38.241) centre (238.581, 20.241) ccw
  line L5 (238.581, 38.241) -> (225.78, 41.559)
  spline S6 degree 4 poles (225.78, 41.559) (223.981701, 41.678798) (218.618296, 41.998081) (209.491978, 42.356496) (196.392584, 42.47009) (181.031283, 42.070233) (165.506388, 41.221743) (149.785249, 40.04478) (134.1096, 38.577548) (118.624688, 36.850842) (103.500036, 34.939301) (88.901638, 32.883406) (74.995754, 30.738214) (61.917783, 28.562704) (49.827113, 26.40977) (38.835364, 24.340018) (29.07721, 22.403865) (20.632296, 20.65644) (13.645605, 19.149082) (6.913163, 17.660714) (2.90218, 16.740022) (0.469137, 16.188187) (0, 16.065) knots 0 0 0 0 0 0.02971241 0.08811623 0.14764545 0.20795901 0.26872109 0.32959596 0.39031605 0.45054625 0.50994444 0.56816554 0.62484975 0.67962982 0.73211898 0.78189715 0.82850859 0.87142025 0.90998584 0.94331385 1 1 1 1 1
  arc A4 (0, 16.065) -> (-0.004161, 15.184114) centre (0.115799, 15.624) ccw
  arc A5 (130.237617, 11.322439) -> (132.12991, 31.350801) centre (142.78, 20.241) cw
  spline S7 degree 4 poles (209.287499, 35.276521) (208.016254, 35.302234) (203.394539, 35.374392) (192.107099, 35.419415) (181.42777, 35.055508) (165.177387, 34.181901) (152.027787, 33.293306) (140.12289, 32.036547) (134.373831, 31.53661) (132.12991, 31.350801) knots 0 0 0 0 0 0.08041067 0.26080902 0.46236226 0.66541434 0.85998968 1 1 1 1 1
  arc A6 (209.287499, 35.276521) -> (210.772015, 7.267069) centre (190.581, 20.241) cw
  spline S8 degree 4 poles (210.772015, 7.267069) (208.879361, 7.312262) (203.376792, 7.457482) (194.11369, 7.76222) (180.967993, 8.298721) (165.65086, 9.03198) (151.022109, 9.904617) (140.198122, 10.625231) (133.276252, 11.107079) (130.237617, 11.322439) knots 0 0 0 0 0 0.09754364 0.2824031 0.47018137 0.65986596 0.85043099 1 1 1 1 1
  circle A7 centre (87.265, 19.422) radius 4
  circle A8 centre (112, 20.241) radius 4.229
  circle A9 centre (238.581, 20.241) radius 12.9
extrude "Extrusion3" add sketch "Sketch1 outline for Extrusion3" along normal blind 5
fillet "Fillet3" radius 3 1 edges at (295.8353, 16.5644, 2.5)
properties part number "R9 Foam"
